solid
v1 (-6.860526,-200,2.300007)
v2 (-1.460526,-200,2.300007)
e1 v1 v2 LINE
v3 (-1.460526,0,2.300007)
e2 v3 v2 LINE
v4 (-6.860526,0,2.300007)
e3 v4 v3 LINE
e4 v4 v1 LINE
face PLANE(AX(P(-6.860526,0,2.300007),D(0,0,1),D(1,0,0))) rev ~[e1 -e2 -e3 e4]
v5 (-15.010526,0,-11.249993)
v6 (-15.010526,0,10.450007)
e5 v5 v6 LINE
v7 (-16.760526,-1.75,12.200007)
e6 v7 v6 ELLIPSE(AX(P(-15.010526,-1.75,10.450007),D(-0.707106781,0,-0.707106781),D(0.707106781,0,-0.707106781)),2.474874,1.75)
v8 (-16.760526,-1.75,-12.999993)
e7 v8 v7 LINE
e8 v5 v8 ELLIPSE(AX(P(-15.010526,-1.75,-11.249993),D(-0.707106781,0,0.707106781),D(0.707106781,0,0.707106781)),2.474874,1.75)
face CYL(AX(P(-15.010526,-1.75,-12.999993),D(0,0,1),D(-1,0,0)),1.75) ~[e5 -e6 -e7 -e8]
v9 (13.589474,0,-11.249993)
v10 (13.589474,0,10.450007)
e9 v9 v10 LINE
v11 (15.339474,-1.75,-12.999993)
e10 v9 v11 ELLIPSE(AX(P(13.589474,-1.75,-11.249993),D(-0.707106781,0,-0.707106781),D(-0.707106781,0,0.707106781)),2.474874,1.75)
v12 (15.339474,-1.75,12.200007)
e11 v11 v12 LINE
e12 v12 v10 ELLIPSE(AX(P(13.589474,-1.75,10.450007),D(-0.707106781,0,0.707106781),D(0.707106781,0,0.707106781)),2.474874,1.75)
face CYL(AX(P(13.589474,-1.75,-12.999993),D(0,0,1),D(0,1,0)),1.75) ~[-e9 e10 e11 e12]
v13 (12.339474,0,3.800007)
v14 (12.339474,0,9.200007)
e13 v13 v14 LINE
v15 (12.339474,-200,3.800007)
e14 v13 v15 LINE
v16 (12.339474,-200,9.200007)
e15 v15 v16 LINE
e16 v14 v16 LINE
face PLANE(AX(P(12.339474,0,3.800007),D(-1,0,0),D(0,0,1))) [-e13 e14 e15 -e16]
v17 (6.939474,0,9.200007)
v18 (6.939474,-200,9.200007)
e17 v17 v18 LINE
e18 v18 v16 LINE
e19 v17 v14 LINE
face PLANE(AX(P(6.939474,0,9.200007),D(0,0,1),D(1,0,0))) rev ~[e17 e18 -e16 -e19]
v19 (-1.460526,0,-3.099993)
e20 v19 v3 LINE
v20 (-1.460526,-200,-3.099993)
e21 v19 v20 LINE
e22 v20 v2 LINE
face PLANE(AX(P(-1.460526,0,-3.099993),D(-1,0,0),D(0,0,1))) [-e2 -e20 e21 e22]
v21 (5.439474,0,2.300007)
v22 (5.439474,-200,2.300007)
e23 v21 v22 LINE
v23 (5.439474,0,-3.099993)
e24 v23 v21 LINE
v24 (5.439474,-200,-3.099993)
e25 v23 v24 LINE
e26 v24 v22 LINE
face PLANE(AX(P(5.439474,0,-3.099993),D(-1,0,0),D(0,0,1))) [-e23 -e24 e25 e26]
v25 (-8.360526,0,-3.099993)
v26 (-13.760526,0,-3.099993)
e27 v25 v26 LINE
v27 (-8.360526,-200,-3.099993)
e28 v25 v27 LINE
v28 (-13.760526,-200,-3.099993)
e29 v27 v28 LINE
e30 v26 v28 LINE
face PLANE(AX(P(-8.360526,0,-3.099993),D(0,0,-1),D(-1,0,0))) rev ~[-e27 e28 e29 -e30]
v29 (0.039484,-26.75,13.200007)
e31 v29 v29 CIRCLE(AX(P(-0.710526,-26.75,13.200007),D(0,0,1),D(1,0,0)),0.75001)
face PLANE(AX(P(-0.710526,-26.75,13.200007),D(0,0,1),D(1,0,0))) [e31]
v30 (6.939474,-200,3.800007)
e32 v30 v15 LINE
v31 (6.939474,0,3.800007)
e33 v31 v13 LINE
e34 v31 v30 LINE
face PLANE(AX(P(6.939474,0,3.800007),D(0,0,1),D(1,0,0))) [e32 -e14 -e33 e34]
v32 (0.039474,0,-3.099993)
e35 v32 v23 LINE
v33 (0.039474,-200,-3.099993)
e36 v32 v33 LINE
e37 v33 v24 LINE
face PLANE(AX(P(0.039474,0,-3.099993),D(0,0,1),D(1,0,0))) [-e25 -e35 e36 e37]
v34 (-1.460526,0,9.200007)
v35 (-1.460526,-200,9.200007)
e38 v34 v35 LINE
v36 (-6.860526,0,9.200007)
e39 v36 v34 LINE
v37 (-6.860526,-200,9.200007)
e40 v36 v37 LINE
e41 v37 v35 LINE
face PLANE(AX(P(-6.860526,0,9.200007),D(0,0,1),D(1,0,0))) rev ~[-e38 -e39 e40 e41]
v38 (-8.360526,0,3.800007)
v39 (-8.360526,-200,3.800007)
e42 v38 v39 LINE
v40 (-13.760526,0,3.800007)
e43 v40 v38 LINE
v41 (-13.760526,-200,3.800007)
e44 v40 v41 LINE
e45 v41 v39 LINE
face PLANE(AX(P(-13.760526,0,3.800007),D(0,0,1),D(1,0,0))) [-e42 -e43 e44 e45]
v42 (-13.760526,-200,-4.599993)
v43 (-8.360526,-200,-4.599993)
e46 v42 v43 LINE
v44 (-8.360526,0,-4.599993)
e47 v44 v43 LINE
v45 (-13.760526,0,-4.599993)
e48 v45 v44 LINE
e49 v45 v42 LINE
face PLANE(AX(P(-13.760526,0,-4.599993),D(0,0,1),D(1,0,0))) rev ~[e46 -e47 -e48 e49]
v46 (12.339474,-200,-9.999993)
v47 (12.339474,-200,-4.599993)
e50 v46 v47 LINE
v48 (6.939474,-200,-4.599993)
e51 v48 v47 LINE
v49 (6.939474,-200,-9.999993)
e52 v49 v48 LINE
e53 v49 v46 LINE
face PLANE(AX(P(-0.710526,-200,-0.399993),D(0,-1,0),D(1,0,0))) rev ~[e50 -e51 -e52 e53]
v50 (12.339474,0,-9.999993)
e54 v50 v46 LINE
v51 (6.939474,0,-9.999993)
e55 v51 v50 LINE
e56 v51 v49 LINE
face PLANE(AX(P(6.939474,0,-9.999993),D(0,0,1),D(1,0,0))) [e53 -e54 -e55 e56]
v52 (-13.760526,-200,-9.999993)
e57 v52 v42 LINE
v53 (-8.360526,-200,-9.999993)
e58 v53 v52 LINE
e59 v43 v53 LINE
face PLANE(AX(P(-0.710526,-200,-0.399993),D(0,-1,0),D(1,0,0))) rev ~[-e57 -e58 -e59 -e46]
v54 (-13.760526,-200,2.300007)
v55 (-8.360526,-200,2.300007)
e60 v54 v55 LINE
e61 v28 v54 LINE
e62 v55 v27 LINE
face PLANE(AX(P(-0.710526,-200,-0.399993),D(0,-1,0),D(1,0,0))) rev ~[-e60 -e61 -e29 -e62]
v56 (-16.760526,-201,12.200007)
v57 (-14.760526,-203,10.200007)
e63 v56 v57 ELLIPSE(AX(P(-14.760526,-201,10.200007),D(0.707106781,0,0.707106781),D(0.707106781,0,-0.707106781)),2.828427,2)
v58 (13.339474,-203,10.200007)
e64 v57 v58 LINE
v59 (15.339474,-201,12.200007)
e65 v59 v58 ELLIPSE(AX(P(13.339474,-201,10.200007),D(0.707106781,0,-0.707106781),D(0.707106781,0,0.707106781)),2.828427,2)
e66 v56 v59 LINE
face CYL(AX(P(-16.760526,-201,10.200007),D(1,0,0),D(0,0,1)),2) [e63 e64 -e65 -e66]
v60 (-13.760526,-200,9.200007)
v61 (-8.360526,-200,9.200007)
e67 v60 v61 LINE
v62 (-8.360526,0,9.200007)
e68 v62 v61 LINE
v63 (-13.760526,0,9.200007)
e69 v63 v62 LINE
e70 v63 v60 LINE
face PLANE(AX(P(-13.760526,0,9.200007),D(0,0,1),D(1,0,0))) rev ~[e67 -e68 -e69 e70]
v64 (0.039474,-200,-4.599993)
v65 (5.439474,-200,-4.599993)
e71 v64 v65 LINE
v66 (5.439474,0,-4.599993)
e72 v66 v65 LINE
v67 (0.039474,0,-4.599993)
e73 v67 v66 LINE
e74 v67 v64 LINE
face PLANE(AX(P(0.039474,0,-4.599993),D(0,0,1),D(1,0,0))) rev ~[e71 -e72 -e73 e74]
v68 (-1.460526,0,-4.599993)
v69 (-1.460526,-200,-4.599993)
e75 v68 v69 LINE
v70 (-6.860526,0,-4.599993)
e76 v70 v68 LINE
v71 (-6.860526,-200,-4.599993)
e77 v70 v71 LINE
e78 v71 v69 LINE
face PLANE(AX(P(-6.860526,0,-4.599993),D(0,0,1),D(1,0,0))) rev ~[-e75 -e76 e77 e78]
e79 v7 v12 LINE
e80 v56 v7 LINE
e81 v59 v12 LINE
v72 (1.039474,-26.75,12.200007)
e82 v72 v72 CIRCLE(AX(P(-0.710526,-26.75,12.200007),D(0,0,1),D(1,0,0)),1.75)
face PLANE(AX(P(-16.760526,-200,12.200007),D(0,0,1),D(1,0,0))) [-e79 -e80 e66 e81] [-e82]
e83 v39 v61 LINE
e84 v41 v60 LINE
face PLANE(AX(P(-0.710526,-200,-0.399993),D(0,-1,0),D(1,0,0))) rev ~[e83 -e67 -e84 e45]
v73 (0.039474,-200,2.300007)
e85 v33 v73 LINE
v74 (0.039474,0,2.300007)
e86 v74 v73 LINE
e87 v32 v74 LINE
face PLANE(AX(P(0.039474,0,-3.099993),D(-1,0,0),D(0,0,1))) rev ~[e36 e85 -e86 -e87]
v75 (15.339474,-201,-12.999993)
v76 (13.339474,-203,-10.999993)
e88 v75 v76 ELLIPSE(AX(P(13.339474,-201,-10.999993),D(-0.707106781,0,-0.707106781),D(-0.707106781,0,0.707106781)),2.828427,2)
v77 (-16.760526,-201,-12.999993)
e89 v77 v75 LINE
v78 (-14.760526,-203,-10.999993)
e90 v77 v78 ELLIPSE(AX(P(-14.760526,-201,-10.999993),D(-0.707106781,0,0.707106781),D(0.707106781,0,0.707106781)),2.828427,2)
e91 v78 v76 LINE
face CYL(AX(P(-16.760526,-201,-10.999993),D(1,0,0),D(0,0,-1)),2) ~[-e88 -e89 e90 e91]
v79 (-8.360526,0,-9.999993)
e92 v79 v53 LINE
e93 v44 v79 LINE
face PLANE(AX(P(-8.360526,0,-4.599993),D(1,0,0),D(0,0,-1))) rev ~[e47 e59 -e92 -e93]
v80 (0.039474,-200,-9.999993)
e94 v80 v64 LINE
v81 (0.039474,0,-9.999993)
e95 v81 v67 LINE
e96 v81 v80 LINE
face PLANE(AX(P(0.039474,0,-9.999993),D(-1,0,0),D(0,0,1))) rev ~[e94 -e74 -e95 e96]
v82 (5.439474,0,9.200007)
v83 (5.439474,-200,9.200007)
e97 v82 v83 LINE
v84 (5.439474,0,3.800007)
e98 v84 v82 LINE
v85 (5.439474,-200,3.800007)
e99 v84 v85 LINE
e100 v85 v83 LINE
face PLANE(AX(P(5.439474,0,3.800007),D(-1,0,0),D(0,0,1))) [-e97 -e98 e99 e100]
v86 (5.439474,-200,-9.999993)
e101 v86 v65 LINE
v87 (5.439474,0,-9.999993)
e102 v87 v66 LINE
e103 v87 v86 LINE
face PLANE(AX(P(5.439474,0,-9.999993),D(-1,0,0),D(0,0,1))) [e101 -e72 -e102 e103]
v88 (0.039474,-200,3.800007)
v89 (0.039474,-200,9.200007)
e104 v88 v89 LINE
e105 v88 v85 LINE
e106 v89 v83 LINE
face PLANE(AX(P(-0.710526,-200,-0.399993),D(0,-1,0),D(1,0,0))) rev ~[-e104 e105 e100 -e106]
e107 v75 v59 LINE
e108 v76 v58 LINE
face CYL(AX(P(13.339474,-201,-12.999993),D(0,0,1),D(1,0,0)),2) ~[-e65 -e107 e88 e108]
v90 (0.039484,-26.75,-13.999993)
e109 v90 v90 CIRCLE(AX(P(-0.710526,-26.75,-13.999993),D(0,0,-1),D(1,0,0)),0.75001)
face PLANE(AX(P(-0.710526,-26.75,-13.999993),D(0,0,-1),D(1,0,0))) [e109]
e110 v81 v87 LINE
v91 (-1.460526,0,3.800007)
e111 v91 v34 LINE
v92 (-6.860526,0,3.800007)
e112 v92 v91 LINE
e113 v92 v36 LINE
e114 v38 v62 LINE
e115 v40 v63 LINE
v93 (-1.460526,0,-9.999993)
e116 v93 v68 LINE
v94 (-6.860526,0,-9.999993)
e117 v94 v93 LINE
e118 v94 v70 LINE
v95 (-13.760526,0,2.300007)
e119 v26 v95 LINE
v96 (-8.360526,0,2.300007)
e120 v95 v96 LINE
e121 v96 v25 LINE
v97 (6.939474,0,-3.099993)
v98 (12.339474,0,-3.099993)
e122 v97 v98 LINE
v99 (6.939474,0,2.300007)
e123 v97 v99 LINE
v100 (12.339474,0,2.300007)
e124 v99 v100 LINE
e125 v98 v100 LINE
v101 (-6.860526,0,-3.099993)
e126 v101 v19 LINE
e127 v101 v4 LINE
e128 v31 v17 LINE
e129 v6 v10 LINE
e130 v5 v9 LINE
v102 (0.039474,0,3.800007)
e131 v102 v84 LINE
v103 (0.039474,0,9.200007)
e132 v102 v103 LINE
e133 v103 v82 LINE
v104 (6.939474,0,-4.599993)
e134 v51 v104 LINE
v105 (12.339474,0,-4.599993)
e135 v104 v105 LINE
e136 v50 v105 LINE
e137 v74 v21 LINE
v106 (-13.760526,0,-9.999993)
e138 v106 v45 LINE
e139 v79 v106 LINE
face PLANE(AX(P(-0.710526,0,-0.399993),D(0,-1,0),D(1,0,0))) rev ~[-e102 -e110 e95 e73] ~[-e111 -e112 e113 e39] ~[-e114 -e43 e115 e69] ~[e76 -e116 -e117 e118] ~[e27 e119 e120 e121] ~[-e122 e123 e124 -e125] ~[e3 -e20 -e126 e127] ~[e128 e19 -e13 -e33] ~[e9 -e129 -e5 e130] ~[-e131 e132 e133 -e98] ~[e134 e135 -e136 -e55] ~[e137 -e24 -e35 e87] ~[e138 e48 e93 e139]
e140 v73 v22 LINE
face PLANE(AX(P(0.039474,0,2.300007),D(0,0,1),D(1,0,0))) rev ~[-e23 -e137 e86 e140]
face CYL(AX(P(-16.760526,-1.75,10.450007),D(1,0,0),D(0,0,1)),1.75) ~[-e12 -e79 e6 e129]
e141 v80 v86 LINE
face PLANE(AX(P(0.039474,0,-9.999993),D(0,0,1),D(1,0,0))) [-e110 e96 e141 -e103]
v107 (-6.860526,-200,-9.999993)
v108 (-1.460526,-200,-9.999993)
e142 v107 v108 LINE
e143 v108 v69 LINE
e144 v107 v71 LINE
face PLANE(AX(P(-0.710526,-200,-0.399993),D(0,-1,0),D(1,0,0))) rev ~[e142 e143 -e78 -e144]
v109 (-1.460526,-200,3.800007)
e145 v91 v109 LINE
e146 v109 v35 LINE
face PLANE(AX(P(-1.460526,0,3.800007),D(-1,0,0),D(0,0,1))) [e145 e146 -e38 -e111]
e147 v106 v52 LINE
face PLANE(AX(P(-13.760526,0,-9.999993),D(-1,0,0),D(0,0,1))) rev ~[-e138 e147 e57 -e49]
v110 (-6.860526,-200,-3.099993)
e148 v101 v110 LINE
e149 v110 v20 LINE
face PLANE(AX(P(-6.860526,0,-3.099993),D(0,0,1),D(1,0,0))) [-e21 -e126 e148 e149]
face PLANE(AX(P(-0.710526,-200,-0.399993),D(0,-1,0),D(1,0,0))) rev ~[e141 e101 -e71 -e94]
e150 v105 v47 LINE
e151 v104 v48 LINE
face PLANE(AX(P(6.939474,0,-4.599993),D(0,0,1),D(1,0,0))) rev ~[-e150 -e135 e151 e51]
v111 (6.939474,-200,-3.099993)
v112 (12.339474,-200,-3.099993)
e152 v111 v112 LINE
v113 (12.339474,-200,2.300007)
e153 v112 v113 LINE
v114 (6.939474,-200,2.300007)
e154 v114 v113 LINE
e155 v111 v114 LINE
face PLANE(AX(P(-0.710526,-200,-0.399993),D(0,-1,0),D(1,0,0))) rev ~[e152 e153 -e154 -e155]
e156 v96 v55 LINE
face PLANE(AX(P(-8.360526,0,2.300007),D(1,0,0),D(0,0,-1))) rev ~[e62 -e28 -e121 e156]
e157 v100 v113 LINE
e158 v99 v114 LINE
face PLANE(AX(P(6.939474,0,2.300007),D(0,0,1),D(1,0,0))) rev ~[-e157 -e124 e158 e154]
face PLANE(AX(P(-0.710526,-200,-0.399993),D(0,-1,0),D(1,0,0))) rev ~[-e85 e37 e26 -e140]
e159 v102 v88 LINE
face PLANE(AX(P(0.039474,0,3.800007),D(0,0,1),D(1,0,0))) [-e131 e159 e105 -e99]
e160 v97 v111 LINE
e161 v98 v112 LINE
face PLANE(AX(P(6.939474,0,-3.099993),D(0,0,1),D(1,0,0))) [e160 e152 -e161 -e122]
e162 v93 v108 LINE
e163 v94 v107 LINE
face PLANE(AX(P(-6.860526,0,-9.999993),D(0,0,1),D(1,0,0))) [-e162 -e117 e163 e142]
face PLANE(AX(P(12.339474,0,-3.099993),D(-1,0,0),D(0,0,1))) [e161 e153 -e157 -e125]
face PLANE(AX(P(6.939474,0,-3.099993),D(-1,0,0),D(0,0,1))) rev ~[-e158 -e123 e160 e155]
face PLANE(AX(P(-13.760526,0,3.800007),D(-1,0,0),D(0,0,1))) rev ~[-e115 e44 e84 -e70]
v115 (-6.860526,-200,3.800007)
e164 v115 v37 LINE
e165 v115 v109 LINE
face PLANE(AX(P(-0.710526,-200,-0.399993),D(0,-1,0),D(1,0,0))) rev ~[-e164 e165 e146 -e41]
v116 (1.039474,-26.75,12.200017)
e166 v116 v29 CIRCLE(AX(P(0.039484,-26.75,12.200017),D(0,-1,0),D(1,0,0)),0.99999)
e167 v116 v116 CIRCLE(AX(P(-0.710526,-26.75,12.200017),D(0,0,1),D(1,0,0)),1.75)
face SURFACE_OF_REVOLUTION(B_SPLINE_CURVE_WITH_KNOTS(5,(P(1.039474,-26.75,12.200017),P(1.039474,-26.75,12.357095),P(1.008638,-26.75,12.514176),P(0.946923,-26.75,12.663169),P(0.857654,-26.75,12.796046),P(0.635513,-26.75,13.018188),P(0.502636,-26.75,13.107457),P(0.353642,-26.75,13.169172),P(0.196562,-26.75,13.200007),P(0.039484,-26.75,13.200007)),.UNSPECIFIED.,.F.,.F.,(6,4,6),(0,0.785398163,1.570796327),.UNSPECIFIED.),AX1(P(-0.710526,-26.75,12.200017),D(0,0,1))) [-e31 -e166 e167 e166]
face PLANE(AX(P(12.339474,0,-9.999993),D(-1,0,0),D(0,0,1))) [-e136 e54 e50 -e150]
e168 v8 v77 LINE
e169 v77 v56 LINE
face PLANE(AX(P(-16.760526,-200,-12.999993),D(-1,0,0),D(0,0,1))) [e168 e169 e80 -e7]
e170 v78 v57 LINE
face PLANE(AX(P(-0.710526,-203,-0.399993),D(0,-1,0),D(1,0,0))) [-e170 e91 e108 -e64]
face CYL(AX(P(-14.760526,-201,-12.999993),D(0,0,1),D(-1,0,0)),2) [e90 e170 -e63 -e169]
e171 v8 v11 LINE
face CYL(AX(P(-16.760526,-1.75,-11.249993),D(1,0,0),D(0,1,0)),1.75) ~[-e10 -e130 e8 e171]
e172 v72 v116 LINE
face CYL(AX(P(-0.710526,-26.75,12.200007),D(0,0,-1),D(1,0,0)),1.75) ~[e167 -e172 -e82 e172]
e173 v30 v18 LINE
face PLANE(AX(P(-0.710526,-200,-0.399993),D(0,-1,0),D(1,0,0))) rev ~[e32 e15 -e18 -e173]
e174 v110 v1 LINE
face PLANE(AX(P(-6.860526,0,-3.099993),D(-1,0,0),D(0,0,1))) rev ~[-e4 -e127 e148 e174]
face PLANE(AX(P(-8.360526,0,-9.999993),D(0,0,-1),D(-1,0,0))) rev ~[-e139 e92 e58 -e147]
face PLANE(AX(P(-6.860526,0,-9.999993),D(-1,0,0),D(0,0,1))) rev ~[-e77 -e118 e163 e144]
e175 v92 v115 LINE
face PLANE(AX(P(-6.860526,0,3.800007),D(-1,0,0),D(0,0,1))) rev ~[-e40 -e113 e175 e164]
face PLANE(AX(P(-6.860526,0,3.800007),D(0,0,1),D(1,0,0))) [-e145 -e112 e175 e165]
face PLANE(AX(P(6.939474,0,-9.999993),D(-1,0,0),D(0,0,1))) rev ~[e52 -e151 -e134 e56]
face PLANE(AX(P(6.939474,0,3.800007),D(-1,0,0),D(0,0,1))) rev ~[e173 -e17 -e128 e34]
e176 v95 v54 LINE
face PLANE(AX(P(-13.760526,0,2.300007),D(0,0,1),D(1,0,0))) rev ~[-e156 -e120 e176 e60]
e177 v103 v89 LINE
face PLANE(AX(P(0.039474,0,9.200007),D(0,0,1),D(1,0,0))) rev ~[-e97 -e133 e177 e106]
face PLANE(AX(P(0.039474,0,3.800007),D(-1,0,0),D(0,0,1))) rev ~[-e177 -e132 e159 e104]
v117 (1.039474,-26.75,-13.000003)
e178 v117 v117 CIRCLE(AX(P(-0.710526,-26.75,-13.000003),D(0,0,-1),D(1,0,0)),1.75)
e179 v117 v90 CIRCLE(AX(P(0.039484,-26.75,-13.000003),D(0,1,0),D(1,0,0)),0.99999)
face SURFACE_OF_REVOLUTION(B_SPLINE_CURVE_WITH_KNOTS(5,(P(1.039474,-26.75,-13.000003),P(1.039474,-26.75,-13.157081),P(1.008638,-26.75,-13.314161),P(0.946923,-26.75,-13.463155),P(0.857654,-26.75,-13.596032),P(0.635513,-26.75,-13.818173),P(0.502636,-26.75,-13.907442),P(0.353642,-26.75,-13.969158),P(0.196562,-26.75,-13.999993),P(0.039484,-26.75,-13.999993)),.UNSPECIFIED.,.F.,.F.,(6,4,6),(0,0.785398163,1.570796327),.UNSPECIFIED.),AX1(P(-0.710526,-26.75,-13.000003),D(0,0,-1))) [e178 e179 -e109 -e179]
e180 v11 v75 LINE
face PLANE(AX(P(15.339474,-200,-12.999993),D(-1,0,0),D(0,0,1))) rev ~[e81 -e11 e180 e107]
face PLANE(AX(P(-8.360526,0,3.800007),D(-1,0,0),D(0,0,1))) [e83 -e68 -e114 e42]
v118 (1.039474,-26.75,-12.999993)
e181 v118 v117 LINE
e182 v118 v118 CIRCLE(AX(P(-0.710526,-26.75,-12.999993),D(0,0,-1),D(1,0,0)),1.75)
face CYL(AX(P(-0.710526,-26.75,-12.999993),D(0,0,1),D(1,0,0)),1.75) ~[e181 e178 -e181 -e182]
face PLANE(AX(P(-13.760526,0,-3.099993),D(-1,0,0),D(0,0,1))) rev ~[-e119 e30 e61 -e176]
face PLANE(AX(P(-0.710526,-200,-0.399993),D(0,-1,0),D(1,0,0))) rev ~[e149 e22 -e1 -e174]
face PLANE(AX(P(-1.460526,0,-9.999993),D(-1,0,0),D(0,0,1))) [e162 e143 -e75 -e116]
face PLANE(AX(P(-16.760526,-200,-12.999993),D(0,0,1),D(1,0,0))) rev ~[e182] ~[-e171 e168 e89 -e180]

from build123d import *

# Parameters (mm, degrees)
F0_W      = 32.1
F0_H      = 25.2
F0_W_2    = 5.4
F0_H_2    = 5.4
F1_DEPTH  = 200
F3_W      = 32.1
F3_H      = 25.2
F4_DEPTH  = 3
F5_R      = 2
F6_R      = 1.75
F7_R      = 1.75
F8_DEPTH  = 1
F9_R      = 0.99999
F10_R     = 1.75
F11_DEPTH = 1
F12_R     = 0.99999


# Not quite as in the source:
# - a fillet or chamfer is up to 0.001 mm smaller than in the source, because OpenCascade refuses the exact size


with BuildPart() as f1:
    # F0 (on Front) → F1 (new body)
    with BuildSketch(Plane.XZ):
        with Locations((-0.710526225, -0.3999928176)):
            Rectangle(F0_W, F0_H)
        Polygon((-13.760526225, -6.9499006331), (-13.760526225, -4.5999928176), (-8.360526225, -4.5999928176), (-8.360526225, -9.9999928176), (-13.760526225, -9.9999928176), align=None, mode=Mode.SUBTRACT)
        with Locations((-4.160526225, -7.2999928176)):
            Rectangle(F0_W_2, F0_H_2, mode=Mode.SUBTRACT)
        Polygon((-13.760526225, -3.0999928176), (-13.760526225, 0.7499149978), (-13.760526225, 2.3000071824), (-8.360526225, 2.3000071824), (-8.360526225, -3.0999928176), align=None, mode=Mode.SUBTRACT)
        with Locations((-4.160526225, -0.3999928176)):
            Rectangle(F0_W_2, F0_H_2, mode=Mode.SUBTRACT)
        with Locations((2.739473775, -7.2999928176)):
            Rectangle(F0_W_2, F0_H_2, mode=Mode.SUBTRACT)
        with Locations((9.639473775, -7.2999928176)):
            Rectangle(F0_W_2, F0_H_2, mode=Mode.SUBTRACT)
        with Locations((2.739473775, -0.3999928176)):
            Rectangle(F0_W_2, F0_H_2, mode=Mode.SUBTRACT)
        with Locations((9.639473775, -0.3999928176)):
            Rectangle(F0_W_2, F0_H_2, mode=Mode.SUBTRACT)
        with Locations((-11.060526225, 6.5000071824)):
            Rectangle(F0_W_2, F0_H_2, mode=Mode.SUBTRACT)
        with Locations((-4.160526225, 6.5000071824)):
            Rectangle(F0_W_2, F0_H_2, mode=Mode.SUBTRACT)
        with Locations((2.739473775, 6.5000071824)):
            Rectangle(F0_W_2, F0_H_2, mode=Mode.SUBTRACT)
        with Locations((9.639473775, 6.5000071824)):
            Rectangle(F0_W_2, F0_H_2, mode=Mode.SUBTRACT)
    extrude(amount=F1_DEPTH)

    # F3 (on face) → F4 (join)
    with BuildSketch(Plane.XZ.offset(200)):
        with Locations((-0.710526225, -0.3999928176)):
            Rectangle(F3_W, F3_H)
    extrude(amount=F4_DEPTH)

    # F5
    f5_edges = [f1.edges().sort_by_distance(p)[0] for p in [
        (15.339474, -203, -0.399993),
        (-0.710526, -203, 12.200007),
        (-16.760526, -203, -0.399993),
        (-0.710526, -203, -12.999993),
    ]]
    fillet(f5_edges, radius=F5_R)

    # F6
    f6_edges = [f1.edges().sort_by_distance(p)[0] for p in [
        (-0.710526, 0, 12.200007),
        (15.339474, 0, -0.399993),
        (-0.710526, 0, -12.999993),
        (-16.760526, 0, -0.399993),
    ]]
    fillet(f6_edges, radius=F6_R)

    # F7 (on face) → F8 (join)
    with BuildSketch(Plane.XY.offset(12.2000071824)):
        with Locations((-0.710526225, -26.75)):
            Circle(F7_R)
    extrude(amount=F8_DEPTH)

    # F9 (radius 1 in the source; OpenCascade refuses exactly that, so slightly less here)
    f9_edges = [f1.edges().sort_by_distance(p)[0] for p in [
        (-2.460526, -26.75, 13.200007),
    ]]
    fillet(f9_edges, radius=F9_R)

    # F10 (on face) → F11 (join)
    with BuildSketch(Plane(origin=(0, 0, -12.9999928176), x_dir=(1, 0, 0), z_dir=(0, 0, -1))):
        with Locations((-0.710526225, 26.75)):
            Circle(F10_R)
    extrude(amount=F11_DEPTH)

    # F12 (radius 1 in the source; OpenCascade refuses exactly that, so slightly less here)
    f12_edges = [f1.edges().sort_by_distance(p)[0] for p in [
        (-2.460526, -26.75, -13.999993),
    ]]
    fillet(f12_edges, radius=F12_R)


solid = f1.part
